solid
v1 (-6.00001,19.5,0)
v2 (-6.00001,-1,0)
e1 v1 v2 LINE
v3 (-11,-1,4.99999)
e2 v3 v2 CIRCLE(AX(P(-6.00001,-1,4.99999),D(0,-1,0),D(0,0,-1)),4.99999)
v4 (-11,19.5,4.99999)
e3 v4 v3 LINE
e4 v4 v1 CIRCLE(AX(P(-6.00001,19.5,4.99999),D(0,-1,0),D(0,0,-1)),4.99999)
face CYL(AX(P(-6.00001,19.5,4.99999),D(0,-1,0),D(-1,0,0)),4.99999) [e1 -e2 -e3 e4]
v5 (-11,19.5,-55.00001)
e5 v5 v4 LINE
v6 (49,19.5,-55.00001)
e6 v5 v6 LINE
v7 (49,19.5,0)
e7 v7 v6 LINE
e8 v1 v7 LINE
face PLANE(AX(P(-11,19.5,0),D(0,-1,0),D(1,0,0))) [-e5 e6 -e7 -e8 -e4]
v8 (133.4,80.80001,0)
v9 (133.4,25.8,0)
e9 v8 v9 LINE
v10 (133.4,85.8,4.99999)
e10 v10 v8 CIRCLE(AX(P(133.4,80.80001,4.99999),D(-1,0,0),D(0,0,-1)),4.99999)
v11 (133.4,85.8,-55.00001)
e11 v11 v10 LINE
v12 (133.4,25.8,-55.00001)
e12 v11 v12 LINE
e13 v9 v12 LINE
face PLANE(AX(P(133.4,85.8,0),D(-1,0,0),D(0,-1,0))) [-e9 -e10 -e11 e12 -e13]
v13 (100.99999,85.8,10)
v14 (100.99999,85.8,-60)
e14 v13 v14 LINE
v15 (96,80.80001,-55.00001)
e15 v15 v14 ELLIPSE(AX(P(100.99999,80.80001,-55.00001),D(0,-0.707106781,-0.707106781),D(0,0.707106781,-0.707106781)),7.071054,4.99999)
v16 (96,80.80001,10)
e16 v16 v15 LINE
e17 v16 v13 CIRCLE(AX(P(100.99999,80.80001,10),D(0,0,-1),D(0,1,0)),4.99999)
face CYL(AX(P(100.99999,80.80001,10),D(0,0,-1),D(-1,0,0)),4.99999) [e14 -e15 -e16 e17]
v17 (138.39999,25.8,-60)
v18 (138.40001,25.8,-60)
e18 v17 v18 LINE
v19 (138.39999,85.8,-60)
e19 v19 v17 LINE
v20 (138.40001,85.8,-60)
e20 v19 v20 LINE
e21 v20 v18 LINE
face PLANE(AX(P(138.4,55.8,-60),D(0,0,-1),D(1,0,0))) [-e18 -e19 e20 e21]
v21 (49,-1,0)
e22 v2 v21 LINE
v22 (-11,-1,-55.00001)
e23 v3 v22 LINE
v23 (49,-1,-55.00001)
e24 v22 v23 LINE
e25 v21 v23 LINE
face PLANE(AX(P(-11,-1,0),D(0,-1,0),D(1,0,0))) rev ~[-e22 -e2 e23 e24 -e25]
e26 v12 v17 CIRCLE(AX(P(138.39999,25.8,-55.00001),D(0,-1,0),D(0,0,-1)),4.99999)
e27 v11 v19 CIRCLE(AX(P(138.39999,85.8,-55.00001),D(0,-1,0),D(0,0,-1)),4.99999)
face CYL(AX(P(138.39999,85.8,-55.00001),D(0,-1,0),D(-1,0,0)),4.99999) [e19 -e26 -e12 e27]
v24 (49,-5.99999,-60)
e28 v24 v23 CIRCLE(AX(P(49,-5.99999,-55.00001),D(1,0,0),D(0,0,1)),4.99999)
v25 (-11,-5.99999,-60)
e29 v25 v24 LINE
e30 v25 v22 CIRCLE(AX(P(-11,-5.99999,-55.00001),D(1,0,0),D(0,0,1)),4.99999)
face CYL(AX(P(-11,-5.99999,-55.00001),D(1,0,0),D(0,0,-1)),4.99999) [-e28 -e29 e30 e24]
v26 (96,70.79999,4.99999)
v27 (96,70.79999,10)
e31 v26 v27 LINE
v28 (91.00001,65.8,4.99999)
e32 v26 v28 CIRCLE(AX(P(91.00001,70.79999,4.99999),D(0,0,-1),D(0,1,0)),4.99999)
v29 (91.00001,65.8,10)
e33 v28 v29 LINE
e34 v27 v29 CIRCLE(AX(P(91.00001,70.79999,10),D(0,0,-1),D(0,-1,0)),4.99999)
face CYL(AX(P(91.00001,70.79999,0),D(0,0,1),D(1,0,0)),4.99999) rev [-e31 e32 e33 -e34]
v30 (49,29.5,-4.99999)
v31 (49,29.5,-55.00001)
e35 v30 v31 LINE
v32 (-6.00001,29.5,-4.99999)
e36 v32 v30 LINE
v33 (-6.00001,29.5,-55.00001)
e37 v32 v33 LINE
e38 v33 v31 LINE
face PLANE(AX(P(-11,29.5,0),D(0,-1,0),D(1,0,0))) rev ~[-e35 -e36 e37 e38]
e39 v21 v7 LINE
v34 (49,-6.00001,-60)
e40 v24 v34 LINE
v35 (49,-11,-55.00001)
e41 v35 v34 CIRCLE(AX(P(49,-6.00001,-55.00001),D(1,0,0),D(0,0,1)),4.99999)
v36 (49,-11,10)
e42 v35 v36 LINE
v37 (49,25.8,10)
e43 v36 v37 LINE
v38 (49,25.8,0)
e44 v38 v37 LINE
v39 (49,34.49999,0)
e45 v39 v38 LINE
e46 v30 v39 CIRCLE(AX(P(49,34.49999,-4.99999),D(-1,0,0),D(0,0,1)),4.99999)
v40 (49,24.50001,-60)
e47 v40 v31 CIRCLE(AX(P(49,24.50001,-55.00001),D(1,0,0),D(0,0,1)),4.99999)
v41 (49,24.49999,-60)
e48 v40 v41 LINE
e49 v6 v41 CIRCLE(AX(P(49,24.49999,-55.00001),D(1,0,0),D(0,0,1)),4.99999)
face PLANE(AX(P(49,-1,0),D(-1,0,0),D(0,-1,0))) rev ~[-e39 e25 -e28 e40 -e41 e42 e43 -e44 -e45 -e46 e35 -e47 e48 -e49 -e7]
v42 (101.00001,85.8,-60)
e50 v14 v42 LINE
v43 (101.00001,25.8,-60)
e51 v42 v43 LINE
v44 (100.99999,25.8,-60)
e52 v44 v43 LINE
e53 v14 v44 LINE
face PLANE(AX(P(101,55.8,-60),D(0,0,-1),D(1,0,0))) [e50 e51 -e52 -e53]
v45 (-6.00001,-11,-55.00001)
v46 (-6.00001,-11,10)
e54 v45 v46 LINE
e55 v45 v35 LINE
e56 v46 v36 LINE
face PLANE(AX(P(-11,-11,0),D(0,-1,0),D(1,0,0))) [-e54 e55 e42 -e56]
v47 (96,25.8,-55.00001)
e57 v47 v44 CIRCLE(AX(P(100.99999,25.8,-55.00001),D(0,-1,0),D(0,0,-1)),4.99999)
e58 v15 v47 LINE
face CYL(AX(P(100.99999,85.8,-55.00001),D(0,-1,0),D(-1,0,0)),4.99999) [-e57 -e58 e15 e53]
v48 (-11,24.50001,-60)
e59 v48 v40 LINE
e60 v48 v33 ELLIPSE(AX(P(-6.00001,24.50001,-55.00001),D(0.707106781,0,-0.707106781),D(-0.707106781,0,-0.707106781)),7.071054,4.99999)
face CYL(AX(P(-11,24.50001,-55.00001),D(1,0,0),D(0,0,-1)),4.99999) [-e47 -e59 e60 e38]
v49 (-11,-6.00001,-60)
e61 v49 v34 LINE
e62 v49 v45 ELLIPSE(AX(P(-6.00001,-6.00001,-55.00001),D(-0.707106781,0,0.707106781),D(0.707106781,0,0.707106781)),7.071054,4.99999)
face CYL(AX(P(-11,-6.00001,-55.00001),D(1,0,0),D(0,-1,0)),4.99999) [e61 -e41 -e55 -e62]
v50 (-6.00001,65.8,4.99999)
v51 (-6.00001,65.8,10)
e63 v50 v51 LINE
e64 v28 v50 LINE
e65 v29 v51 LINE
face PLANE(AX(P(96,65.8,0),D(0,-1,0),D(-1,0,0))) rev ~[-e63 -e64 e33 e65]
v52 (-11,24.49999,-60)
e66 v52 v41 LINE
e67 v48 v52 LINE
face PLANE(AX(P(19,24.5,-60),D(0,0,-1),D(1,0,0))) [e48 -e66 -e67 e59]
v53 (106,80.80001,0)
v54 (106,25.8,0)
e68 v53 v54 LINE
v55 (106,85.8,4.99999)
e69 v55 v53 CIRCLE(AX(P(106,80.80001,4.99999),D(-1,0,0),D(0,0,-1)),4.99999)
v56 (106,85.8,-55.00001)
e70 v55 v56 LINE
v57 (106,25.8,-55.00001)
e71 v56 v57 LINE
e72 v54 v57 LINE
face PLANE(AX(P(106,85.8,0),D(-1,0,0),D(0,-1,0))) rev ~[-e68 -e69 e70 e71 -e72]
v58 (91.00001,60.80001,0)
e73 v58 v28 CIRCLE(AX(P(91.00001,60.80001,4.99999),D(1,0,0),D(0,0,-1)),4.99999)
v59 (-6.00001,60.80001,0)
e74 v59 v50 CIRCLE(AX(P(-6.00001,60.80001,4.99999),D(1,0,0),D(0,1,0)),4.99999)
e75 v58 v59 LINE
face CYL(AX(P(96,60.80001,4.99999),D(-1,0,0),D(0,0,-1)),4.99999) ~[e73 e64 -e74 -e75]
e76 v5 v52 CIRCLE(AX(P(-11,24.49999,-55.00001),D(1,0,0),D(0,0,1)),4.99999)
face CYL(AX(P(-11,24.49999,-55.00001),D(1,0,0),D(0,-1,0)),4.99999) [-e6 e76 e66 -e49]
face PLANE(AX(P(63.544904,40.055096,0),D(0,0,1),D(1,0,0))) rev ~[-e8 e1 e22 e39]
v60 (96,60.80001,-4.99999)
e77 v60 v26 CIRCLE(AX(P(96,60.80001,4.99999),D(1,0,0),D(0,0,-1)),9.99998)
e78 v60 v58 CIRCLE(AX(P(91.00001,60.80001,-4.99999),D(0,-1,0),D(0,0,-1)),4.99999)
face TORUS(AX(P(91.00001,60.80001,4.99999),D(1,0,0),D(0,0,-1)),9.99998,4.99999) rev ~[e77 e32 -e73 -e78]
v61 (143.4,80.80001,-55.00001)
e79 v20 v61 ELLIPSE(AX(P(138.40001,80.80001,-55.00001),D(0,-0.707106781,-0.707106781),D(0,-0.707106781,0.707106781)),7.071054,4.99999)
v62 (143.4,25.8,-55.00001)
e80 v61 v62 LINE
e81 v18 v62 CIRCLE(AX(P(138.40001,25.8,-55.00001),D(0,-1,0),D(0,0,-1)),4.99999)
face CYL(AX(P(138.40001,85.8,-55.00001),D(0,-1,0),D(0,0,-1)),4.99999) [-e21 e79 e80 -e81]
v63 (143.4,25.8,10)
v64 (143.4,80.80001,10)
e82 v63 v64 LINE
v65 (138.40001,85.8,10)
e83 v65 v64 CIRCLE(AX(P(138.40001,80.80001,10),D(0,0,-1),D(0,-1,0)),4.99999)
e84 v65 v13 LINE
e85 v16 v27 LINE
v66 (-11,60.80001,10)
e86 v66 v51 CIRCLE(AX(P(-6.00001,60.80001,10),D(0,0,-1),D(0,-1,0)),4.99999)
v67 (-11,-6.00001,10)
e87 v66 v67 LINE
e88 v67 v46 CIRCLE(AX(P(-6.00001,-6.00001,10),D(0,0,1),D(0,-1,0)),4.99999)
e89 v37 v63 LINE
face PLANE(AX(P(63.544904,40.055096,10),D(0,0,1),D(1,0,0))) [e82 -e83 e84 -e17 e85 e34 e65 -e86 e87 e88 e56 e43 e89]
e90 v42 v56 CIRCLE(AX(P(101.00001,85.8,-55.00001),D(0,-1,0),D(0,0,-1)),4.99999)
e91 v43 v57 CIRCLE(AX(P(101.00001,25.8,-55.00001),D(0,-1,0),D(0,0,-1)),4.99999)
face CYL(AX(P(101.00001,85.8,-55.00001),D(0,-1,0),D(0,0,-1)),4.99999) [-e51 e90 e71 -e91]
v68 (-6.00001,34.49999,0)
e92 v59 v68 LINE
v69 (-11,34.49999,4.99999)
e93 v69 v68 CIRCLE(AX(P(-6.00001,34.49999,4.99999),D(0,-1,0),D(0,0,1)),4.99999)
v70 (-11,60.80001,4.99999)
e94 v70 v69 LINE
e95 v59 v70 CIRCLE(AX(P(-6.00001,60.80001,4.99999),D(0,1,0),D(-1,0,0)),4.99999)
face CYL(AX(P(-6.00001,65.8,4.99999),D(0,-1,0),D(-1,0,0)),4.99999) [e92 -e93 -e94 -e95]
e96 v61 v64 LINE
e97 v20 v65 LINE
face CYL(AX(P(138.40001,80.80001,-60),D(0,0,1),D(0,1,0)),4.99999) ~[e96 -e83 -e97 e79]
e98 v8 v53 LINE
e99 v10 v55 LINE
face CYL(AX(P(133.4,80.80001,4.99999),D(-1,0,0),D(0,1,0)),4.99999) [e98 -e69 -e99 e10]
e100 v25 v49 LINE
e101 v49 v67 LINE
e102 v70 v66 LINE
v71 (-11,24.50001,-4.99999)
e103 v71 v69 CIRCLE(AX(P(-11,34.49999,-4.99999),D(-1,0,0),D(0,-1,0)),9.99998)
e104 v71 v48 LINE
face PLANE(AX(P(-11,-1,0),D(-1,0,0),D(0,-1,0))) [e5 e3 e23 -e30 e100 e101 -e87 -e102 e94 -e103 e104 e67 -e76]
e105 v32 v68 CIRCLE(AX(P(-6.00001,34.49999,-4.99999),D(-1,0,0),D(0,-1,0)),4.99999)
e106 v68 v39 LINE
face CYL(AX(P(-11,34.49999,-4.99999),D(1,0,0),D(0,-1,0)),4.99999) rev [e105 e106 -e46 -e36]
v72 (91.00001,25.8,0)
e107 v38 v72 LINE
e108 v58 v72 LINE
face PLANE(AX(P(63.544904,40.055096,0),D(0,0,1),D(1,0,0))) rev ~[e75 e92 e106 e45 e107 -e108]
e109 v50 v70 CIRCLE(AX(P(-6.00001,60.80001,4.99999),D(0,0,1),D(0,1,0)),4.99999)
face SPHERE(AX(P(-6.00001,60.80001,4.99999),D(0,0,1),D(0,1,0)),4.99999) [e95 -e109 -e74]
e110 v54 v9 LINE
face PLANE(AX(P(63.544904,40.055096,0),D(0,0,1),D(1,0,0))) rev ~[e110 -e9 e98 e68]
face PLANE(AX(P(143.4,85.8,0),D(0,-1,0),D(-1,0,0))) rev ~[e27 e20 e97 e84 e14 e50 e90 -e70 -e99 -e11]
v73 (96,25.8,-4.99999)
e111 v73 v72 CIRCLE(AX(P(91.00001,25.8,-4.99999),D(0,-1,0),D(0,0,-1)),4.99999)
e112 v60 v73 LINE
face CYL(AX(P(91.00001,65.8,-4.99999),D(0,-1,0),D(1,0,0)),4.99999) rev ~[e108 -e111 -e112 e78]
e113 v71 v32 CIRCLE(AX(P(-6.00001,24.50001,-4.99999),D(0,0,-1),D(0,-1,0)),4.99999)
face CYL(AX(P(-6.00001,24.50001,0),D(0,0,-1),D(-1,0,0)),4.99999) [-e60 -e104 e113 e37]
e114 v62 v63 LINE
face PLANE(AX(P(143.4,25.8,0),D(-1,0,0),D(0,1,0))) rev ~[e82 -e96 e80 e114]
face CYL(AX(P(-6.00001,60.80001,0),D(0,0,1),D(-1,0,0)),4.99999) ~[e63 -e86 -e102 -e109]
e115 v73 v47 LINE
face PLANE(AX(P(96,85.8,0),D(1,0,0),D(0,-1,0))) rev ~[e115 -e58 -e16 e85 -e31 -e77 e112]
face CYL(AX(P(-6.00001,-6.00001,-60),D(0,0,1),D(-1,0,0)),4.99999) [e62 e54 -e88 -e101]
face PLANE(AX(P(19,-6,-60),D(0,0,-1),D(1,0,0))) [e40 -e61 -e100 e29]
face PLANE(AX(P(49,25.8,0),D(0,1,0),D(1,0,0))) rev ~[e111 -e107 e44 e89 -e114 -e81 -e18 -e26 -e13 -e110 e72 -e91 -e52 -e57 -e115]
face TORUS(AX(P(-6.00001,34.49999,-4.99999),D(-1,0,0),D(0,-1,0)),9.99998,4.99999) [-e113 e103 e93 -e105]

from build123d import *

# Parameters (mm, degrees)
F2_DEPTH = 10
F3_W     = 60
F3_H     = 10
F3_W_2   = 10
F3_H_2   = 60
F4_DEPTH = 60
F5_R     = 4.99999


# Not quite as in the source:
# - a fillet or chamfer is up to 0.001 mm smaller than in the source, because OpenCascade refuses the exact size


with BuildPart() as f2:
    # F1 (on Top) → F2 (new body)
    with BuildSketch(Plane.XY):
        Polygon((-11, 65.8), (-11, -11), (49, -11), (49, 25.8), (143.4, 25.8), (143.4, 85.8), (96, 85.8), (96, 65.8), align=None)
    extrude(amount=F2_DEPTH)

    # F3 (on face) → F4 (join)
    with BuildSketch(Plane(origin=(0, 0, 0), x_dir=(1, 0, 0), z_dir=(0, 0, -1))):
        with Locations((19, 6)):
            Rectangle(F3_W, F3_H)
        with Locations((19, -24.5)):
            Rectangle(F3_W, F3_H)
        with Locations((101, -55.8)):
            Rectangle(F3_W_2, F3_H_2)
        with Locations((138.4, -55.8)):
            Rectangle(F3_W_2, F3_H_2)
    extrude(amount=F4_DEPTH)

    # F5 (radius 5 in the source; OpenCascade refuses exactly that, so slightly less here)
    f5_edges = [f2.edges().sort_by_distance(p)[0] for p in [
        (96, 65.8, 5),
        (96, 85.8, -25),
        (143.4, 85.8, -25),
        (-11, 65.8, 5),
        (-11, 29.5, -30),
        (-11, -11, -25),
        (119.7, 85.8, 0),
        (42.5, 65.8, 0),
        (-11, 47.65, 0),
        (-11, 9.25, 0),
        (133.4, 55.8, -60),
        (106, 55.8, -60),
        (96, 55.8, -60),
        (143.4, 55.8, -60),
        (19, 29.5, 0),
        (19, 29.5, -60),
        (19, -11, -60),
        (19, -1, -60),
        (19, 19.5, -60),
        (96, 45.8, 0),
    ]]
    fillet(f5_edges, radius=F5_R)


solid = f2.part
